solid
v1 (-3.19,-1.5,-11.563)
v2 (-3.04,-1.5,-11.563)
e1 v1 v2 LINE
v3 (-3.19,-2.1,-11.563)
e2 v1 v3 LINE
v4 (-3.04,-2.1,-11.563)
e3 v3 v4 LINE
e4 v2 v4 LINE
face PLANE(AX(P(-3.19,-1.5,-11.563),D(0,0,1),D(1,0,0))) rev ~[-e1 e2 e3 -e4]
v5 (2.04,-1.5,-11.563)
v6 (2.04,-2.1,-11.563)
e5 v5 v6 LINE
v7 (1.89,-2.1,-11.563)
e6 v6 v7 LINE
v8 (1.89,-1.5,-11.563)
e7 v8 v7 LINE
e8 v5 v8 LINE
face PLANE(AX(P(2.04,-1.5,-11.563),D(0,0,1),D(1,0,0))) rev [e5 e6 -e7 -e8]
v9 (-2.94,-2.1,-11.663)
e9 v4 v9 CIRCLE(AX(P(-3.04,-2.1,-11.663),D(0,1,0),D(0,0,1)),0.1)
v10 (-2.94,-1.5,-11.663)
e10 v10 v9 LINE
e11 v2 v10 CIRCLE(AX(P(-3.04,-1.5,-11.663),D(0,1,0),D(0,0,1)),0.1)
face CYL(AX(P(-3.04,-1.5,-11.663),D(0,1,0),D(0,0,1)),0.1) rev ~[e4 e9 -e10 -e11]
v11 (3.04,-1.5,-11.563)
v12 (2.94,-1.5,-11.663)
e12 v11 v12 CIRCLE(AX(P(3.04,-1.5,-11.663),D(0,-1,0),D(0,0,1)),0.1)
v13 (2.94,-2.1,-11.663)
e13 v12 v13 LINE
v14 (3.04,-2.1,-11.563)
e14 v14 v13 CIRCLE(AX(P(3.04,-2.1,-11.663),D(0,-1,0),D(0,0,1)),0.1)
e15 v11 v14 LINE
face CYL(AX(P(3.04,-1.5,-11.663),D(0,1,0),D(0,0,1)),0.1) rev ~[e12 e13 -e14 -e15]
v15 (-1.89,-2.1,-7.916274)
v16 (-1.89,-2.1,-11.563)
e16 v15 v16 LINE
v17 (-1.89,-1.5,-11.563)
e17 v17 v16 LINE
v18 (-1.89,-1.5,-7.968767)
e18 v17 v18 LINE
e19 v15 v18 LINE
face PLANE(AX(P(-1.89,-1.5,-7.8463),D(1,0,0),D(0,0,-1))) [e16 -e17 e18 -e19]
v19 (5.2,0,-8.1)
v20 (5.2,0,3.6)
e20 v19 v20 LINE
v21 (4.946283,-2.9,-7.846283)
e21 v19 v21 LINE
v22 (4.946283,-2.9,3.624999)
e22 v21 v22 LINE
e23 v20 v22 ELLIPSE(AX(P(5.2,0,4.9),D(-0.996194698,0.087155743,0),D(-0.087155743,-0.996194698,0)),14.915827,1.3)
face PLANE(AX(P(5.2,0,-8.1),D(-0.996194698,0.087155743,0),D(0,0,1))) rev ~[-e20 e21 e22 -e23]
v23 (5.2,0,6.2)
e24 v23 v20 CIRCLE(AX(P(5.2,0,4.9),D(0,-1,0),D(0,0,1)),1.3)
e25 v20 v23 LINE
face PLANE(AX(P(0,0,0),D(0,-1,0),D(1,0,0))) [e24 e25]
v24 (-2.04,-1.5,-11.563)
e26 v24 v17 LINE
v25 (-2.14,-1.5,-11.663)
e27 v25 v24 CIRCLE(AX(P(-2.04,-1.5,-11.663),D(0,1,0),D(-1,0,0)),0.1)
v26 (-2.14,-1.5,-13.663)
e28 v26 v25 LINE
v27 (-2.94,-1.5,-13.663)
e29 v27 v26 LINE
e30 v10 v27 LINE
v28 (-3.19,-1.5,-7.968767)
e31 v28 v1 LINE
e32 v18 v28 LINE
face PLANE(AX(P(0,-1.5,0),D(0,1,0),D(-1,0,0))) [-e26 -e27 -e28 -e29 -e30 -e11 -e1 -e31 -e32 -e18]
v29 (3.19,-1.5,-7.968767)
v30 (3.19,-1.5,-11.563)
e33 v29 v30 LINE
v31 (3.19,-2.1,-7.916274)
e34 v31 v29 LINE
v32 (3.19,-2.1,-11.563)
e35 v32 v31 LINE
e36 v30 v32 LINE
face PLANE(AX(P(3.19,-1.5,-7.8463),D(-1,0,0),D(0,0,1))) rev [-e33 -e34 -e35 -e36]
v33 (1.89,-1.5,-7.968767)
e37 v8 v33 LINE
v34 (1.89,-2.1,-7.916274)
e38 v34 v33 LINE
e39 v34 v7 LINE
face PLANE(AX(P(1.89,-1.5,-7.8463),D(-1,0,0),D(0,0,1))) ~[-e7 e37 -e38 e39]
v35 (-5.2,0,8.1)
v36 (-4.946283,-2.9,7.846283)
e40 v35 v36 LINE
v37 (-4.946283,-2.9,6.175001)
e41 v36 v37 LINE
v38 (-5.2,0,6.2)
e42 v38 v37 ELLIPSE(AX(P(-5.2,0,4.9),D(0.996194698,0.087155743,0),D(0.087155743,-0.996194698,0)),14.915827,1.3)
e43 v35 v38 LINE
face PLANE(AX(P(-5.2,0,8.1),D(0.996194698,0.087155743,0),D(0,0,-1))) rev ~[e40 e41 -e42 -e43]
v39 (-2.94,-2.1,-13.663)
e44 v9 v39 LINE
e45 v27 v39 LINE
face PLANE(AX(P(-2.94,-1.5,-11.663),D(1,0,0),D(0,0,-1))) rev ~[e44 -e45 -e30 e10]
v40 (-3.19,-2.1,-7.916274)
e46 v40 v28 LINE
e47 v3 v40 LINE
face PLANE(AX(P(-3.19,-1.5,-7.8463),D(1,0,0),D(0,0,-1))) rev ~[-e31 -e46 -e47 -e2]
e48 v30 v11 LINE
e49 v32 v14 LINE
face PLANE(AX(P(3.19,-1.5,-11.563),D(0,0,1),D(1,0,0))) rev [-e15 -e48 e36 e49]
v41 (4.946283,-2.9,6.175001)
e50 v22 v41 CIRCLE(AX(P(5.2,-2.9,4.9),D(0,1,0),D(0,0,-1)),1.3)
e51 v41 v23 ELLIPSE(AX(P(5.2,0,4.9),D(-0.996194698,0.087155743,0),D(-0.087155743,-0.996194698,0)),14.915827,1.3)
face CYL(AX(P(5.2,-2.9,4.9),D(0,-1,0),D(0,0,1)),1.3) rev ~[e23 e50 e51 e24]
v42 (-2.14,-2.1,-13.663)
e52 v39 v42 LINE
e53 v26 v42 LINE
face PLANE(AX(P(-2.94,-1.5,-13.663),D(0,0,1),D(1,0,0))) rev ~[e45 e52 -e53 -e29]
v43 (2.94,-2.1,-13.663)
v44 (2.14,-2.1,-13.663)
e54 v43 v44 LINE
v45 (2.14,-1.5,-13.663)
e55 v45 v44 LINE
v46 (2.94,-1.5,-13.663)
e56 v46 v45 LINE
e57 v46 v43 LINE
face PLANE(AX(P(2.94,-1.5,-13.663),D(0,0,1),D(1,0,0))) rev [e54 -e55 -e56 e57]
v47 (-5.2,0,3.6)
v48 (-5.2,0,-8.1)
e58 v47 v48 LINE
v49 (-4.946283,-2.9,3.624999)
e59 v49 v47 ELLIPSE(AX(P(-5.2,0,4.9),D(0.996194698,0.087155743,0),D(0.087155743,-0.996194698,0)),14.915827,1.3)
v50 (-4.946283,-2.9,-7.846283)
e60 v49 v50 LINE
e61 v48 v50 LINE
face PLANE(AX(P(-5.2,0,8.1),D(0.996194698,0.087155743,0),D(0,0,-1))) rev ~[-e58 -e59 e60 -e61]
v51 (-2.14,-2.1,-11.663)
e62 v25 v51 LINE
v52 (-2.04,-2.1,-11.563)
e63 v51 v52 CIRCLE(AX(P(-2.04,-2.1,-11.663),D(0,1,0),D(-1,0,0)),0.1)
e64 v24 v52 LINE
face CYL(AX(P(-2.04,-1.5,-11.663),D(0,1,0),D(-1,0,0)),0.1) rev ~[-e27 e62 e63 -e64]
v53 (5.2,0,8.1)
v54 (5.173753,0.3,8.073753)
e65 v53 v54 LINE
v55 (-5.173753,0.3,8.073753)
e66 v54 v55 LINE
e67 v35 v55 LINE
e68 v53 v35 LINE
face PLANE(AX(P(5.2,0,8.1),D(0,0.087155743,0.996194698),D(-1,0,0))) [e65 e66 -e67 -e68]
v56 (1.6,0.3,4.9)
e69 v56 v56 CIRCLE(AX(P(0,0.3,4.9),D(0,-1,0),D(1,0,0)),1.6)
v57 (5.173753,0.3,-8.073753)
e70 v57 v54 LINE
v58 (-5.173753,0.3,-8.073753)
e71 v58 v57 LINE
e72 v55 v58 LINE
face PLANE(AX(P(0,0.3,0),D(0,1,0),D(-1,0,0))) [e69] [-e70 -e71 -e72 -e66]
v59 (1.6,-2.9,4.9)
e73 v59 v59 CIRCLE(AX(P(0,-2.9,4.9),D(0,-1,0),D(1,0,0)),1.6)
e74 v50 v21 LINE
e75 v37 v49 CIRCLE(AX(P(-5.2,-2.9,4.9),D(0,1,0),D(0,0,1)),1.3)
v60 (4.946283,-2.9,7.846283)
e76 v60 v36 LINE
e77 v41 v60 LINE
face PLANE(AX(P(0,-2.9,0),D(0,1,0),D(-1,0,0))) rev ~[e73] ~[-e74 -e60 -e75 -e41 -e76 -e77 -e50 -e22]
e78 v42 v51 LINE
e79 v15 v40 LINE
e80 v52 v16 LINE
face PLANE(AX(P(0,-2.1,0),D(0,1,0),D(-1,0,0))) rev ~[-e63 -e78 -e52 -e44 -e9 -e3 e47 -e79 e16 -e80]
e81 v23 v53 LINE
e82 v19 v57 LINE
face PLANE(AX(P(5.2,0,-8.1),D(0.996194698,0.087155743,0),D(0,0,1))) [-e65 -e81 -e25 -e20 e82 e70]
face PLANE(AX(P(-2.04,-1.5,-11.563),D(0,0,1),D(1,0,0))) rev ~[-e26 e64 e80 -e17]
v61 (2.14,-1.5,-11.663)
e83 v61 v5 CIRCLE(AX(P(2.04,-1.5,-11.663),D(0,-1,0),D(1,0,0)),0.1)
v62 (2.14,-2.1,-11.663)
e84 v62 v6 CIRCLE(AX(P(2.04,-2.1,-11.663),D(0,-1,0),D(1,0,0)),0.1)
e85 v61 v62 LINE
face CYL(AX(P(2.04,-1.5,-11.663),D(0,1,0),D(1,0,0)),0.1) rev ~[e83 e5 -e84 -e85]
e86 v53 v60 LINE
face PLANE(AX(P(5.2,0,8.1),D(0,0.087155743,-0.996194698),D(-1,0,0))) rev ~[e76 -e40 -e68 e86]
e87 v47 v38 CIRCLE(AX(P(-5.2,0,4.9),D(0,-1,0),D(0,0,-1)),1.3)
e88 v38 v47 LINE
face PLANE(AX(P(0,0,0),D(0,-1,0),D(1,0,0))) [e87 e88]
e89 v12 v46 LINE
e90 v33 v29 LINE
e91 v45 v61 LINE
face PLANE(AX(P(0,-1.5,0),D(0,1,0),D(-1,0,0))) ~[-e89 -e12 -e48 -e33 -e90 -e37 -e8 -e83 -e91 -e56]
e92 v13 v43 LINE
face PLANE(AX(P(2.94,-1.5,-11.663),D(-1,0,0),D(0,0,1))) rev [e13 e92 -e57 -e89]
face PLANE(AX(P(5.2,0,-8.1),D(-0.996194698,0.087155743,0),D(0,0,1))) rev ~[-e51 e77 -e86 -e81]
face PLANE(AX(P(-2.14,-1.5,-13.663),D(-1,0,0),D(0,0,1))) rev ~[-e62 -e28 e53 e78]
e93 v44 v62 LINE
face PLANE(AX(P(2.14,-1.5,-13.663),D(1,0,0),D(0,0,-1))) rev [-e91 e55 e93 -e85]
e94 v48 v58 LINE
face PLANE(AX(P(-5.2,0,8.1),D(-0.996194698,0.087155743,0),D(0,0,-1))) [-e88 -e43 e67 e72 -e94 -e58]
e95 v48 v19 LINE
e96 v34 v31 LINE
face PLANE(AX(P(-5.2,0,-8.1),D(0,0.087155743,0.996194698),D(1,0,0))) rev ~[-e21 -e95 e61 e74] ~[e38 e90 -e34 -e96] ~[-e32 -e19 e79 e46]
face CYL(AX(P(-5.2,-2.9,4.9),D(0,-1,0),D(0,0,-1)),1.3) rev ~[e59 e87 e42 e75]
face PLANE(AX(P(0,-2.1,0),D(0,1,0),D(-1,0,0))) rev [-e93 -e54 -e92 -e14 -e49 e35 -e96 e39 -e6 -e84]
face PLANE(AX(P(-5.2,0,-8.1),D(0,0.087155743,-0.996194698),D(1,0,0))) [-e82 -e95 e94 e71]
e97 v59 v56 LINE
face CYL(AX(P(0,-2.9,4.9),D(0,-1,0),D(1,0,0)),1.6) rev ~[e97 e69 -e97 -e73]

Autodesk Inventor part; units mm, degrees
ref_plane "YZ Plane" through (0, 0, 0) normal (1, 0, 0) x (0, 1, 0)
ref_plane "XY Plane" through (0, 0, 0) normal (0, 0, 1) x (1, 0, 0)
sketch "Sketch1" plane through (0, 0, 0) normal (0, 1, 0) x (-1, 0, 0)
  line L0 (5.2, -8.1) -> (-5.2, -8.1)
  line L1 (-5.2, -8.1) -> (-5.2, 8.1)
  line L2 (-5.2, 8.1) -> (5.2, 8.1)
  line L3 (5.2, 8.1) -> (5.2, -8.1)
  line L4 (5.2, -8.1) -> (-5.2, 8.1) construction
  line L5 (-5.2, -8.1) -> (5.2, 8.1) construction
  point P0 (0, 0)
  dimension "d0" = 16.2
  dimension "d1" = 10.4
extrude "Extrusion1" add sketch "Sketch1" along normal blind 0.3 draft -5 and the other way blind 2.9 draft -5
sketch "Sketch2" plane through (0, -2.9, 0) normal (0, -1, 0) x (1, 0, 0)
  line L0 (-4.9463, -7.8463) -> (-4.9463, 7.8463) projected
  line L1 (4.9463, -7.8463) -> (-4.9463, -7.8463) projected
  line L2 (4.9463, 7.8463) -> (4.9463, -7.8463) projected
  line L3 (-4.9463, 7.8463) -> (4.9463, 7.8463) projected
  circle A0 centre (0, 4.9) radius 1.6
  line L4 (5.2, 8.1) -> (-5.2, 8.1) projected
  point P0 (0, 0)
  dimension "d6" = 3.2
  dimension "d7" = 3.2
extrude "Extrusion2" cut sketch "Sketch2" against normal through all contours A0
sketch "Sketch3" plane through (0, -2.9, 0) normal (0, -1, 0) x (1, 0, 0)
  line L0 (-4.9463, -7.8463) -> (-4.9463, 7.8463) projected
  line L1 (-5.2, 8.1) -> (-4.9463, 7.8463) projected
  line L2 (-5.2, 8.1) -> (-5.2, -8.1) projected
  line L3 (-5.2, -8.1) -> (-4.9463, -7.8463) projected
  circle A0 centre (0, 4.9) radius 1.6 projected
  line L4 (-4.9463, -7.8463) -> (-4.9463, 7.8463) projected
  line L5 (4.9463, -7.8463) -> (-4.9463, -7.8463) projected
  line L6 (4.9463, 7.8463) -> (4.9463, -7.8463) projected
  line L7 (-4.9463, 7.8463) -> (4.9463, 7.8463) projected
  line L8 (4.9463, 7.8463) -> (4.9463, -7.8463) projected
  line L9 (5.2, -8.1) -> (4.9463, -7.8463) projected
  line L10 (5.2, -8.1) -> (5.2, 8.1) projected
  line L11 (5.2, 8.1) -> (4.9463, 7.8463) projected
  line L12 (-5.2, 8.1) -> (-5.2, -8.1) projected
  arc A1 (-5.2, 3.6) -> (-5.2, 6.2) centre (-5.2, 4.9) ccw
  line L13 (5.2, -8.1) -> (5.2, 8.1) projected
  arc A2 (5.2, 6.2) -> (5.2, 3.6) centre (5.2, 4.9) ccw
  point P0 (0, 0)
  dimension "d10" = 1.3
extrude "Extrusion3" cut sketch "Sketch3" against normal up to surface (2.9 mm away) contours A1 L2 L0 | L0 A1 | A2 L6 | L6 A2 L10
ref_plane "Work Plane1" through (0, -1.5, 0) normal (0, 1, 0) x (-1, 0, 0)
sketch "Sketch4" plane through (0, -1.5, 0) normal (0, 1, 0) x (-1, 0, 0)
  line L0 (-4.9463, -7.8463) -> (4.9463, -7.8463) projected
  line L1 (5.2, -8.1) -> (4.9463, -7.8463) projected
  line L2 (5.2, -8.1) -> (-5.2, -8.1) projected
  line L3 (-5.2, -8.1) -> (-4.9463, -7.8463) projected
  line L4 (3.19, -7.8463) -> (3.19, -11.563)
  line L5 (5.2, -8.1) -> (-5.2, -8.1) projected
  line L6 (3.19, -11.563) -> (3.04, -11.563)
  arc A0 (3.04, -11.563) -> (2.94, -11.663) centre (3.04, -11.663) ccw
  line L7 (2.94, -11.663) -> (2.94, -13.663)
  line L8 (2.94, -13.663) -> (2.14, -13.663)
  line L9 (2.14, -13.663) -> (2.14, -11.663)
  arc A1 (2.14, -11.663) -> (2.04, -11.563) centre (2.04, -11.663) ccw
  line L10 (2.04, -11.563) -> (1.89, -11.563)
  line L11 (1.89, -7.8463) -> (1.89, -11.563)
  circle A2 centre (0, 4.9) radius 1.6 projected
  dimension "d21" = 0.8
  dimension "d22" = 1.3
  dimension "d23" = 0.1
  dimension "d24" = 16.463
  dimension "d25" = 1.89
  dimension "d26" = 2.1
extrude "Extrusion4" add sketch "Sketch4" against normal blind 0.6 contours L0 L4 L2 L11 | L2 L4 L6 A0 L7 L8 L9 A1 L10 L11
mirror "Mirror1" about plane through (0, 0, 0) normal (1, 0, 0) of "Extrusion4"
sketch "Sketch5" plane through (0, 0.3, 0) normal (0, 1, 0) x (1, 0, 0)
  circle A0 centre (0, -4.9) radius 1.6 projected
  line L0 (5.1738, 8.0738) -> (5.1738, -8.0738) projected
  line L1 (-5.1738, 8.0738) -> (5.1738, 8.0738) projected
  line L2 (-5.1738, -8.0738) -> (-5.1738, 8.0738) projected
  line L3 (5.1738, -8.0738) -> (-5.1738, -8.0738) projected
  line L4 (4.25, -2.237) -> (-4.25, -2.237)
  line L5 (-4.25, -2.237) -> (-4.25, 7.163)
  line L6 (-4.25, 7.163) -> (4.25, 7.163)
  line L7 (4.25, 7.163) -> (4.25, -2.237)
  point P0 (0, 0)
  point P1 (0, -2.237)
  dimension "d34" = 8.5
  dimension "d35" = 9.4
  dimension "d36" = 2.663
split_face "Split1"
properties part number "Resistor_TH-TO220" material "ABS Plastic"
